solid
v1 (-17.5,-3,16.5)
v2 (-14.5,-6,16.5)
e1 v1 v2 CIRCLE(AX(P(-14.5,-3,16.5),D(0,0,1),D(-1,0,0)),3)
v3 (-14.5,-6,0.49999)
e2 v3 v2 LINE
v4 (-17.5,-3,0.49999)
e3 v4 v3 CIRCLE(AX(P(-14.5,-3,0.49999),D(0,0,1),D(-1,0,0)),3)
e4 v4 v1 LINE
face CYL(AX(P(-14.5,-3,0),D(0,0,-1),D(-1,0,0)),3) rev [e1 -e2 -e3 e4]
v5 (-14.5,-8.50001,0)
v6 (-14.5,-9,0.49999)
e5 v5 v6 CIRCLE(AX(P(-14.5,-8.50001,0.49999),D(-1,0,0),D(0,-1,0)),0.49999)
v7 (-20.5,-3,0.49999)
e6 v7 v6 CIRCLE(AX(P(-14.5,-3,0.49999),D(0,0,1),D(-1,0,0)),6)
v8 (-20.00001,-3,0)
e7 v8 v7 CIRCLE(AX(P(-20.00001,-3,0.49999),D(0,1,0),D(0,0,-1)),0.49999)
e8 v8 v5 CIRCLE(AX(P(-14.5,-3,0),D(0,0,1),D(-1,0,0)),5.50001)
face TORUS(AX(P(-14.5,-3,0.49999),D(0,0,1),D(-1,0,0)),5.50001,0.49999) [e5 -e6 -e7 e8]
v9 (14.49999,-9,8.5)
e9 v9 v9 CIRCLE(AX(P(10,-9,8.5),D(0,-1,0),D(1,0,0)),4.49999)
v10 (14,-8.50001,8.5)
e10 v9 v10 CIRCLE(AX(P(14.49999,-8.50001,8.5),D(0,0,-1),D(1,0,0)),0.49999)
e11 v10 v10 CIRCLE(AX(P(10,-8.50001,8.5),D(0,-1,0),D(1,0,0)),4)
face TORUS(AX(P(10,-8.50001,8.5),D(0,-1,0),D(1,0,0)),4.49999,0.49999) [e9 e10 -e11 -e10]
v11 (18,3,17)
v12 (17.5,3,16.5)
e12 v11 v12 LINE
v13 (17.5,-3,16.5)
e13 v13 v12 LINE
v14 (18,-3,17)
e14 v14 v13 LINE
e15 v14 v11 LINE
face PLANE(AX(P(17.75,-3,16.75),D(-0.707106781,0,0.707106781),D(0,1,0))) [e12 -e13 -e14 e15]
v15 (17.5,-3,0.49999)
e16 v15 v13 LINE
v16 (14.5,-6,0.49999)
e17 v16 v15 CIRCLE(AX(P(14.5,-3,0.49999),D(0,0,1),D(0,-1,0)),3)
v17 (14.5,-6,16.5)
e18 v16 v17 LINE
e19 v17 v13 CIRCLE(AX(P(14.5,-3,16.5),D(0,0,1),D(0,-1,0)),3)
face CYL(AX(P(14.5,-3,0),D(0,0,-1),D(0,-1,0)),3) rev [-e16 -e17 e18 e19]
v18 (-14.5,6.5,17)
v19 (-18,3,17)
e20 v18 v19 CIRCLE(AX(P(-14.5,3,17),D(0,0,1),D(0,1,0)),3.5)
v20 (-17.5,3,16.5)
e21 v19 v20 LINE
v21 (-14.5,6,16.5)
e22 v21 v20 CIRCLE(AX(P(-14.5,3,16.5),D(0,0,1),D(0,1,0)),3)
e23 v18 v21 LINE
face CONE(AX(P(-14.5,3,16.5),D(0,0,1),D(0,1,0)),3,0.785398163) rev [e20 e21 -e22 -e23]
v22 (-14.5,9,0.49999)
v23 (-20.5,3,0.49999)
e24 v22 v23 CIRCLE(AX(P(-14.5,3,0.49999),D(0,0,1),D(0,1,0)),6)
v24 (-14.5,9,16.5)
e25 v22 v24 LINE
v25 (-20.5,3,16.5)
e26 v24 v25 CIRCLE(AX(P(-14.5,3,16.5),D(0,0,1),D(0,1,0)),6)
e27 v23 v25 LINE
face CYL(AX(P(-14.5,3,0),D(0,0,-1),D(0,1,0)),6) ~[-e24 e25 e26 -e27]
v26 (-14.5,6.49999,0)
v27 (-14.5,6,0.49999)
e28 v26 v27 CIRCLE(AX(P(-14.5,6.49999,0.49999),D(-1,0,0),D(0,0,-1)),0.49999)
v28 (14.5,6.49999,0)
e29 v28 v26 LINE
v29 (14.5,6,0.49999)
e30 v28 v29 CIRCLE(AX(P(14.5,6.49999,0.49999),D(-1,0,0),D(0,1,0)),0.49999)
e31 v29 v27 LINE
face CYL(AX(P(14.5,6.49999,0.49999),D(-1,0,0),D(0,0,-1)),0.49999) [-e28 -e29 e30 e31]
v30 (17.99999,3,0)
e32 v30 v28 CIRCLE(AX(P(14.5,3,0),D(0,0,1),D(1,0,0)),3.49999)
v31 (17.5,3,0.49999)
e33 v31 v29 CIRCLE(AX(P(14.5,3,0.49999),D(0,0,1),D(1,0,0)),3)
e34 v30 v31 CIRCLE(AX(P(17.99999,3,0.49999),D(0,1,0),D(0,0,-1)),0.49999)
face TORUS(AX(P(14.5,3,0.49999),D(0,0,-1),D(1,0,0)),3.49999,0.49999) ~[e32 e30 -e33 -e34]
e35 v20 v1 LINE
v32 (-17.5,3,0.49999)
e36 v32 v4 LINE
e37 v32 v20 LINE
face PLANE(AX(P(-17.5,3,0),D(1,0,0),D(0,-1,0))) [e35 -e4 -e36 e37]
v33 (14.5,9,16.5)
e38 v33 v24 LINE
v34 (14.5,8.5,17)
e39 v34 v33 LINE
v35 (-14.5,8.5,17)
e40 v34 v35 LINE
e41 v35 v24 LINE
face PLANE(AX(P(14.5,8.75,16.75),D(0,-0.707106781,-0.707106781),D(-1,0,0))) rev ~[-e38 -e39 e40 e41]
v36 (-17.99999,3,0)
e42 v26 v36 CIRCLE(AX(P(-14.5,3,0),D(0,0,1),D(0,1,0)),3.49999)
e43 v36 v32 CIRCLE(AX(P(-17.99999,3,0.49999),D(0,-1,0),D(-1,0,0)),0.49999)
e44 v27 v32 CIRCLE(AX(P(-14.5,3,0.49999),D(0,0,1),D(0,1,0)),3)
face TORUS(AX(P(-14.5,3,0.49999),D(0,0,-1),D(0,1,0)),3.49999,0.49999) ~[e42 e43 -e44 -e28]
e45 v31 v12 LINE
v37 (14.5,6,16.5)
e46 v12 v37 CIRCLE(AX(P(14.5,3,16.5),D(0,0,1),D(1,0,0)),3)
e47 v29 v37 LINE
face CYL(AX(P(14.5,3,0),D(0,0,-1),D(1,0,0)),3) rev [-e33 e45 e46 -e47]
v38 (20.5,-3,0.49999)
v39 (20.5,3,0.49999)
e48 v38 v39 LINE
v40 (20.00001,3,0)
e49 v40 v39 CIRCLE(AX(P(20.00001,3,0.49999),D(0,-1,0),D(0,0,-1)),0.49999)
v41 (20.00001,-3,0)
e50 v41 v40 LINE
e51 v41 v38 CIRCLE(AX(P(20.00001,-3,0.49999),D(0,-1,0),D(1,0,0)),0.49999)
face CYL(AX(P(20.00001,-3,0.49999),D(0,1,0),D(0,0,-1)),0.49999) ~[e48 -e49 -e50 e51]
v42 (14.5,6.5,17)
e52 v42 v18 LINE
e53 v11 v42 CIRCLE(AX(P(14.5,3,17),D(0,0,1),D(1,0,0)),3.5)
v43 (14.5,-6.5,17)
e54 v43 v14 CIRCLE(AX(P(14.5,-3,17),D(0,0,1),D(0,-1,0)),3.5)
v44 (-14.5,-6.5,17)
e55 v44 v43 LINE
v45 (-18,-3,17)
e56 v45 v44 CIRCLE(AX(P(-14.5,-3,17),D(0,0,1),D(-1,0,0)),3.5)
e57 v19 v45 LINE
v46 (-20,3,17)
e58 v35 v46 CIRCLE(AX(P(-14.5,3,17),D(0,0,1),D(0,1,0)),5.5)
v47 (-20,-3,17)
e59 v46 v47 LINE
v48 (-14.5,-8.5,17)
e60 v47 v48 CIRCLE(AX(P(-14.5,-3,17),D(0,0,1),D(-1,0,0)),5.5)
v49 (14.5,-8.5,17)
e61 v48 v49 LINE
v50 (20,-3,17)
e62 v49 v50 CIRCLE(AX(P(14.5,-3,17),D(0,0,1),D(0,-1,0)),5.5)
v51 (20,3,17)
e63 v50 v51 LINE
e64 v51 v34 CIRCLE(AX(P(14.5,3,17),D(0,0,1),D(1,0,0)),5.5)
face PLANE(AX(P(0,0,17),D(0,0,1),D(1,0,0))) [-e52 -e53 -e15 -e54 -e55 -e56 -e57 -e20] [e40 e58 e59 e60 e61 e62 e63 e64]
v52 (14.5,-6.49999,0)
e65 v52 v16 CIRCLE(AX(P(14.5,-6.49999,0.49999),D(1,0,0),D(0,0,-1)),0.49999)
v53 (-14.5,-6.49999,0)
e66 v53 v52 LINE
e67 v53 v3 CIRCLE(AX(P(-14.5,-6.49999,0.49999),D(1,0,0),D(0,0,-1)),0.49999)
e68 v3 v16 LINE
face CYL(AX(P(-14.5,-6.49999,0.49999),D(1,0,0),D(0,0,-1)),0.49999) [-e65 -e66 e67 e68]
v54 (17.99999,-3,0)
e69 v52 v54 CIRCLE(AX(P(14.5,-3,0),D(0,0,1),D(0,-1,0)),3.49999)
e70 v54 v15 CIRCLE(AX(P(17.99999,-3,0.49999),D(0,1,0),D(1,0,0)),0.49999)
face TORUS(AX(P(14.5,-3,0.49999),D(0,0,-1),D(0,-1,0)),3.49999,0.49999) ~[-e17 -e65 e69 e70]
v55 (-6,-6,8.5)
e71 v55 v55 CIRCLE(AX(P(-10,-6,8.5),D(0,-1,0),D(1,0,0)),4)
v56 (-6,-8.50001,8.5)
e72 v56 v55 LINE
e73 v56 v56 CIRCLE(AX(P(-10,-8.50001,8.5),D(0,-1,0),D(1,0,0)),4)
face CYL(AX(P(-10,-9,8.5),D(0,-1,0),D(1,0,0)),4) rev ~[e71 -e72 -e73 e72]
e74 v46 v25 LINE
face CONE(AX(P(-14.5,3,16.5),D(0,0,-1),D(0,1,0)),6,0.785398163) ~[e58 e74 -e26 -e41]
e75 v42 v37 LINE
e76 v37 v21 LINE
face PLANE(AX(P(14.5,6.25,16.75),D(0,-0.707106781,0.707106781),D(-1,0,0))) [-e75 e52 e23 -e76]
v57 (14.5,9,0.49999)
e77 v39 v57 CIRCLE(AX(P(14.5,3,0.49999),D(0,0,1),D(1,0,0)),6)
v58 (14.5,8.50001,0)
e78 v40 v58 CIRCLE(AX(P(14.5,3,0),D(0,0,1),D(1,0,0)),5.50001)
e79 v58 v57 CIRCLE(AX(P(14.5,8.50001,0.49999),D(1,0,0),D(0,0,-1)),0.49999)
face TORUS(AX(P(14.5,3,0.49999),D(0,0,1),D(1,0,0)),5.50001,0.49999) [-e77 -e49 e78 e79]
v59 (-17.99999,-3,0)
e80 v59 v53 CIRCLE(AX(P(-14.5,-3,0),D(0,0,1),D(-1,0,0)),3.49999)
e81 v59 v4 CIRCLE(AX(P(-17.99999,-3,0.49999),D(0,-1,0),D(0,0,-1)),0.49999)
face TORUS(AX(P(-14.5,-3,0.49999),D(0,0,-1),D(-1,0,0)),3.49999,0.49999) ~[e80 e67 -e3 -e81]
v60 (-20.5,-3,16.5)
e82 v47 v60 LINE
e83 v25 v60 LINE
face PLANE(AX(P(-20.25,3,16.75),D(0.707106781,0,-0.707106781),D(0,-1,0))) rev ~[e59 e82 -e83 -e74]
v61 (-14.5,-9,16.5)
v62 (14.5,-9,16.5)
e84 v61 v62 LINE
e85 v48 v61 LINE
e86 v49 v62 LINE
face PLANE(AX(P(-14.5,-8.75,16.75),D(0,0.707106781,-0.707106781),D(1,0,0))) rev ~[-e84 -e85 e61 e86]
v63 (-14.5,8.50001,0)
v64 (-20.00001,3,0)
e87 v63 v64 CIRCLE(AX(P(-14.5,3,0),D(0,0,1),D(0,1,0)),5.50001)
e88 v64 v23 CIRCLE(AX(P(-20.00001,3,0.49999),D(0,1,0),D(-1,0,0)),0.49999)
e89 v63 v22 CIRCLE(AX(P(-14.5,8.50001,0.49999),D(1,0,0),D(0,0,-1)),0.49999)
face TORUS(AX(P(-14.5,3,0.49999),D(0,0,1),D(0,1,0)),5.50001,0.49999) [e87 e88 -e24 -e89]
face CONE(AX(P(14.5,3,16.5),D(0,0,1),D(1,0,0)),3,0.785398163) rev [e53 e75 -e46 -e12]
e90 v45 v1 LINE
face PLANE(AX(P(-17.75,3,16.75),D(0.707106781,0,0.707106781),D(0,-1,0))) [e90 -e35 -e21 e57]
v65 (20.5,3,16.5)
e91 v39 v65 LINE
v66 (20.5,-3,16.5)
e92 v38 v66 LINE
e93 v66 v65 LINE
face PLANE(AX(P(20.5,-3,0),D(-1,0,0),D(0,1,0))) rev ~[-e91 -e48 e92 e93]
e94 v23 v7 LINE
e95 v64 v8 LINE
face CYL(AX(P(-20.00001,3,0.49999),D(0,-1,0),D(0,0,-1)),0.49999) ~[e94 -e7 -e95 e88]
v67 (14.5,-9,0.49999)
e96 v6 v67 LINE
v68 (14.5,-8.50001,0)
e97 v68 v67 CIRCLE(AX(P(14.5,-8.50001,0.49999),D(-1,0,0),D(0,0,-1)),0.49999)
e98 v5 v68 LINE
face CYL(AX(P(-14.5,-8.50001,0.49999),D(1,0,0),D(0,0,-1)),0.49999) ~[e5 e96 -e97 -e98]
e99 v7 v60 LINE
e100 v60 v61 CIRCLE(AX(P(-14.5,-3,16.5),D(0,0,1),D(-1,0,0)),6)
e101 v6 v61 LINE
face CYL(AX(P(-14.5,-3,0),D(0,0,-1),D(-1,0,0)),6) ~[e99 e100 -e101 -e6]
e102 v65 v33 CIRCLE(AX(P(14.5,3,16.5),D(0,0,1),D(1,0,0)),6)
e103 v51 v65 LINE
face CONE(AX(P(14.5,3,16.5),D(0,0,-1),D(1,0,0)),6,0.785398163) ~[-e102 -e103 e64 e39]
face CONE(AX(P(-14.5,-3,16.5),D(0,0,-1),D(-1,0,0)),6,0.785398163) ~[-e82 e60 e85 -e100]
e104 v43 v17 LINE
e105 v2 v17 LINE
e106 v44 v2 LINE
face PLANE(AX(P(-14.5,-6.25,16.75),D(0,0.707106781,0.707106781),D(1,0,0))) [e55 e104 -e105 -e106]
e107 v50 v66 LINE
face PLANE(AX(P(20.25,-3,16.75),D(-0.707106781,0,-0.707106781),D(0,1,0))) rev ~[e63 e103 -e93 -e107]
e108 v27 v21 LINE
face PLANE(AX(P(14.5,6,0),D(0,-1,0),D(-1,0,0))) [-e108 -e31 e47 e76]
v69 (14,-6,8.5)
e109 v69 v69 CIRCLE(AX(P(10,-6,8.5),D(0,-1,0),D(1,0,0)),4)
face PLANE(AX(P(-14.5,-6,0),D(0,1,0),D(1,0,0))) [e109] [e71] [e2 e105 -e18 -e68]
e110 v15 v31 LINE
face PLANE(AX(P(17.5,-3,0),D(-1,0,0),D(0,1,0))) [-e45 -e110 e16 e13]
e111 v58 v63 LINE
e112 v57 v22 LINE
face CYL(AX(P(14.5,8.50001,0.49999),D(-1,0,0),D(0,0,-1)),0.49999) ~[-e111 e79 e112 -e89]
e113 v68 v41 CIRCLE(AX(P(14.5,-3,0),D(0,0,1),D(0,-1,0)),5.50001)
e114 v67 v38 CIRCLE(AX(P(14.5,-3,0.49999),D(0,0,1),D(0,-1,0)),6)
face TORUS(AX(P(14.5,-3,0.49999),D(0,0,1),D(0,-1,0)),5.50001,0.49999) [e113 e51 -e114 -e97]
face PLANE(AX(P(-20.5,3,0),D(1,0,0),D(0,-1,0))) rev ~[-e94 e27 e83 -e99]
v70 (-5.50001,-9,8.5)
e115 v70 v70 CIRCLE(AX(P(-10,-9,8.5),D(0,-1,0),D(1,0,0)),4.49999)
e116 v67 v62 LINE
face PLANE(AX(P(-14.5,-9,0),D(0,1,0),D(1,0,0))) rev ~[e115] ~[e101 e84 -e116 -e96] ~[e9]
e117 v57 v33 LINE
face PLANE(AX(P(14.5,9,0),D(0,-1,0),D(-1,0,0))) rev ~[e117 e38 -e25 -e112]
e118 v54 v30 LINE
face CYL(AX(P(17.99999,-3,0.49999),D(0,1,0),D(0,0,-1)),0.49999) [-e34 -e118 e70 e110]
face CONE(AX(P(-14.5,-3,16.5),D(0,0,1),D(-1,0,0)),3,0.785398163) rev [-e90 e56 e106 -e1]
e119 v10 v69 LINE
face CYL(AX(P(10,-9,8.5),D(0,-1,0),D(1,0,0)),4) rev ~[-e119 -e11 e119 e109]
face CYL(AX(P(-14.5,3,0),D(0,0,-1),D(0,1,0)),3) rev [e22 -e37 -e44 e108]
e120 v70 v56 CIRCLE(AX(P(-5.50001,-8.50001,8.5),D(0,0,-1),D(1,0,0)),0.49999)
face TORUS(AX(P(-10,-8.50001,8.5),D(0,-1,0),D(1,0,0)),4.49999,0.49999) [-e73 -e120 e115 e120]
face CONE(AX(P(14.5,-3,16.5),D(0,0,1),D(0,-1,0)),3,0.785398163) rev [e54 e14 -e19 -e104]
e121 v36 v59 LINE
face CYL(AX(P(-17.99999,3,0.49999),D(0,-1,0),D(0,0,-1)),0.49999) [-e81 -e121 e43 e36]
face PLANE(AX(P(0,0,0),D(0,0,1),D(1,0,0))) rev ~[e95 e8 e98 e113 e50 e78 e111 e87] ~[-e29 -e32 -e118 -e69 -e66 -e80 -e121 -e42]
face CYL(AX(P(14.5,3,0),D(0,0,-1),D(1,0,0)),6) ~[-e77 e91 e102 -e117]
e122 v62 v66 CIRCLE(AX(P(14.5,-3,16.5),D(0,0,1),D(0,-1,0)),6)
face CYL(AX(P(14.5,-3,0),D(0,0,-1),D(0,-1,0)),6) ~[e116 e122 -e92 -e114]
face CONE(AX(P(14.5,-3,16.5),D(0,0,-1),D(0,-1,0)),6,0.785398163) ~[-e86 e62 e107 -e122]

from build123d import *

# Parameters (mm, degrees)
F1_DEPTH = 17
F2_T     = -3
F3_R     = 4
F4_DEPTH = 5
F5_R     = 0.49999
F6_SIZE  = 0.5


# Not quite as in the source:
# - a fillet or chamfer is up to 0.001 mm smaller than in the source, because OpenCascade refuses the exact size


with BuildPart() as f1:
    # F0 (on Top) → F1 (new body)
    with BuildSketch(Plane.XY):
        with BuildLine():
            ThreePointArc((-20.5, -3), (-18.7426406871, -7.2426406871), (-14.5, -9))
            Line((-14.5, -9), (14.5, -9))
            ThreePointArc((14.5, -9), (18.7426406871, -7.2426406871), (20.5, -3))
            Line((20.5, -3), (20.5, 3))
            ThreePointArc((20.5, 3), (18.7426406871, 7.2426406871), (14.5, 9))
            Line((14.5, 9), (-14.5, 9))
            ThreePointArc((-14.5, 9), (-18.7426406871, 7.2426406871), (-20.5, 3))
            Line((-20.5, 3), (-20.5, -3))
        make_face()
    extrude(amount=F1_DEPTH)

    # F2
    f2_openings = [f1.faces().sort_by_distance(p)[0] for p in [
        (0, 0, 17),
        (0, 0, 0),
    ]]
    offset(amount=F2_T, openings=f2_openings)

    # F3 (on face) → F4 (cut)
    with BuildSketch(Plane.XZ.offset(9)):
        with Locations((-10, 8.5)):
            Circle(F3_R)
        with Locations((10, 8.5)):
            Circle(F3_R)
    extrude(amount=-F4_DEPTH, mode=Mode.SUBTRACT)

    # F5 (radius 0.5 in the source; OpenCascade refuses exactly that, so slightly less here)
    f5_edges = [f1.edges().sort_by_distance(p)[0] for p in [
        (0, 9, 0),
        (0, -6, 0),
        (6, -9, 8.5),
        (-14, -9, 8.5),
    ]]
    fillet(f5_edges, radius=F5_R)

    # F6
    f6_edges = [f1.edges().sort_by_distance(p)[0] for p in [
        (0, -9, 17),
        (0, -6, 17),
    ]]
    chamfer(f6_edges, length=F6_SIZE)


solid = f1.part
